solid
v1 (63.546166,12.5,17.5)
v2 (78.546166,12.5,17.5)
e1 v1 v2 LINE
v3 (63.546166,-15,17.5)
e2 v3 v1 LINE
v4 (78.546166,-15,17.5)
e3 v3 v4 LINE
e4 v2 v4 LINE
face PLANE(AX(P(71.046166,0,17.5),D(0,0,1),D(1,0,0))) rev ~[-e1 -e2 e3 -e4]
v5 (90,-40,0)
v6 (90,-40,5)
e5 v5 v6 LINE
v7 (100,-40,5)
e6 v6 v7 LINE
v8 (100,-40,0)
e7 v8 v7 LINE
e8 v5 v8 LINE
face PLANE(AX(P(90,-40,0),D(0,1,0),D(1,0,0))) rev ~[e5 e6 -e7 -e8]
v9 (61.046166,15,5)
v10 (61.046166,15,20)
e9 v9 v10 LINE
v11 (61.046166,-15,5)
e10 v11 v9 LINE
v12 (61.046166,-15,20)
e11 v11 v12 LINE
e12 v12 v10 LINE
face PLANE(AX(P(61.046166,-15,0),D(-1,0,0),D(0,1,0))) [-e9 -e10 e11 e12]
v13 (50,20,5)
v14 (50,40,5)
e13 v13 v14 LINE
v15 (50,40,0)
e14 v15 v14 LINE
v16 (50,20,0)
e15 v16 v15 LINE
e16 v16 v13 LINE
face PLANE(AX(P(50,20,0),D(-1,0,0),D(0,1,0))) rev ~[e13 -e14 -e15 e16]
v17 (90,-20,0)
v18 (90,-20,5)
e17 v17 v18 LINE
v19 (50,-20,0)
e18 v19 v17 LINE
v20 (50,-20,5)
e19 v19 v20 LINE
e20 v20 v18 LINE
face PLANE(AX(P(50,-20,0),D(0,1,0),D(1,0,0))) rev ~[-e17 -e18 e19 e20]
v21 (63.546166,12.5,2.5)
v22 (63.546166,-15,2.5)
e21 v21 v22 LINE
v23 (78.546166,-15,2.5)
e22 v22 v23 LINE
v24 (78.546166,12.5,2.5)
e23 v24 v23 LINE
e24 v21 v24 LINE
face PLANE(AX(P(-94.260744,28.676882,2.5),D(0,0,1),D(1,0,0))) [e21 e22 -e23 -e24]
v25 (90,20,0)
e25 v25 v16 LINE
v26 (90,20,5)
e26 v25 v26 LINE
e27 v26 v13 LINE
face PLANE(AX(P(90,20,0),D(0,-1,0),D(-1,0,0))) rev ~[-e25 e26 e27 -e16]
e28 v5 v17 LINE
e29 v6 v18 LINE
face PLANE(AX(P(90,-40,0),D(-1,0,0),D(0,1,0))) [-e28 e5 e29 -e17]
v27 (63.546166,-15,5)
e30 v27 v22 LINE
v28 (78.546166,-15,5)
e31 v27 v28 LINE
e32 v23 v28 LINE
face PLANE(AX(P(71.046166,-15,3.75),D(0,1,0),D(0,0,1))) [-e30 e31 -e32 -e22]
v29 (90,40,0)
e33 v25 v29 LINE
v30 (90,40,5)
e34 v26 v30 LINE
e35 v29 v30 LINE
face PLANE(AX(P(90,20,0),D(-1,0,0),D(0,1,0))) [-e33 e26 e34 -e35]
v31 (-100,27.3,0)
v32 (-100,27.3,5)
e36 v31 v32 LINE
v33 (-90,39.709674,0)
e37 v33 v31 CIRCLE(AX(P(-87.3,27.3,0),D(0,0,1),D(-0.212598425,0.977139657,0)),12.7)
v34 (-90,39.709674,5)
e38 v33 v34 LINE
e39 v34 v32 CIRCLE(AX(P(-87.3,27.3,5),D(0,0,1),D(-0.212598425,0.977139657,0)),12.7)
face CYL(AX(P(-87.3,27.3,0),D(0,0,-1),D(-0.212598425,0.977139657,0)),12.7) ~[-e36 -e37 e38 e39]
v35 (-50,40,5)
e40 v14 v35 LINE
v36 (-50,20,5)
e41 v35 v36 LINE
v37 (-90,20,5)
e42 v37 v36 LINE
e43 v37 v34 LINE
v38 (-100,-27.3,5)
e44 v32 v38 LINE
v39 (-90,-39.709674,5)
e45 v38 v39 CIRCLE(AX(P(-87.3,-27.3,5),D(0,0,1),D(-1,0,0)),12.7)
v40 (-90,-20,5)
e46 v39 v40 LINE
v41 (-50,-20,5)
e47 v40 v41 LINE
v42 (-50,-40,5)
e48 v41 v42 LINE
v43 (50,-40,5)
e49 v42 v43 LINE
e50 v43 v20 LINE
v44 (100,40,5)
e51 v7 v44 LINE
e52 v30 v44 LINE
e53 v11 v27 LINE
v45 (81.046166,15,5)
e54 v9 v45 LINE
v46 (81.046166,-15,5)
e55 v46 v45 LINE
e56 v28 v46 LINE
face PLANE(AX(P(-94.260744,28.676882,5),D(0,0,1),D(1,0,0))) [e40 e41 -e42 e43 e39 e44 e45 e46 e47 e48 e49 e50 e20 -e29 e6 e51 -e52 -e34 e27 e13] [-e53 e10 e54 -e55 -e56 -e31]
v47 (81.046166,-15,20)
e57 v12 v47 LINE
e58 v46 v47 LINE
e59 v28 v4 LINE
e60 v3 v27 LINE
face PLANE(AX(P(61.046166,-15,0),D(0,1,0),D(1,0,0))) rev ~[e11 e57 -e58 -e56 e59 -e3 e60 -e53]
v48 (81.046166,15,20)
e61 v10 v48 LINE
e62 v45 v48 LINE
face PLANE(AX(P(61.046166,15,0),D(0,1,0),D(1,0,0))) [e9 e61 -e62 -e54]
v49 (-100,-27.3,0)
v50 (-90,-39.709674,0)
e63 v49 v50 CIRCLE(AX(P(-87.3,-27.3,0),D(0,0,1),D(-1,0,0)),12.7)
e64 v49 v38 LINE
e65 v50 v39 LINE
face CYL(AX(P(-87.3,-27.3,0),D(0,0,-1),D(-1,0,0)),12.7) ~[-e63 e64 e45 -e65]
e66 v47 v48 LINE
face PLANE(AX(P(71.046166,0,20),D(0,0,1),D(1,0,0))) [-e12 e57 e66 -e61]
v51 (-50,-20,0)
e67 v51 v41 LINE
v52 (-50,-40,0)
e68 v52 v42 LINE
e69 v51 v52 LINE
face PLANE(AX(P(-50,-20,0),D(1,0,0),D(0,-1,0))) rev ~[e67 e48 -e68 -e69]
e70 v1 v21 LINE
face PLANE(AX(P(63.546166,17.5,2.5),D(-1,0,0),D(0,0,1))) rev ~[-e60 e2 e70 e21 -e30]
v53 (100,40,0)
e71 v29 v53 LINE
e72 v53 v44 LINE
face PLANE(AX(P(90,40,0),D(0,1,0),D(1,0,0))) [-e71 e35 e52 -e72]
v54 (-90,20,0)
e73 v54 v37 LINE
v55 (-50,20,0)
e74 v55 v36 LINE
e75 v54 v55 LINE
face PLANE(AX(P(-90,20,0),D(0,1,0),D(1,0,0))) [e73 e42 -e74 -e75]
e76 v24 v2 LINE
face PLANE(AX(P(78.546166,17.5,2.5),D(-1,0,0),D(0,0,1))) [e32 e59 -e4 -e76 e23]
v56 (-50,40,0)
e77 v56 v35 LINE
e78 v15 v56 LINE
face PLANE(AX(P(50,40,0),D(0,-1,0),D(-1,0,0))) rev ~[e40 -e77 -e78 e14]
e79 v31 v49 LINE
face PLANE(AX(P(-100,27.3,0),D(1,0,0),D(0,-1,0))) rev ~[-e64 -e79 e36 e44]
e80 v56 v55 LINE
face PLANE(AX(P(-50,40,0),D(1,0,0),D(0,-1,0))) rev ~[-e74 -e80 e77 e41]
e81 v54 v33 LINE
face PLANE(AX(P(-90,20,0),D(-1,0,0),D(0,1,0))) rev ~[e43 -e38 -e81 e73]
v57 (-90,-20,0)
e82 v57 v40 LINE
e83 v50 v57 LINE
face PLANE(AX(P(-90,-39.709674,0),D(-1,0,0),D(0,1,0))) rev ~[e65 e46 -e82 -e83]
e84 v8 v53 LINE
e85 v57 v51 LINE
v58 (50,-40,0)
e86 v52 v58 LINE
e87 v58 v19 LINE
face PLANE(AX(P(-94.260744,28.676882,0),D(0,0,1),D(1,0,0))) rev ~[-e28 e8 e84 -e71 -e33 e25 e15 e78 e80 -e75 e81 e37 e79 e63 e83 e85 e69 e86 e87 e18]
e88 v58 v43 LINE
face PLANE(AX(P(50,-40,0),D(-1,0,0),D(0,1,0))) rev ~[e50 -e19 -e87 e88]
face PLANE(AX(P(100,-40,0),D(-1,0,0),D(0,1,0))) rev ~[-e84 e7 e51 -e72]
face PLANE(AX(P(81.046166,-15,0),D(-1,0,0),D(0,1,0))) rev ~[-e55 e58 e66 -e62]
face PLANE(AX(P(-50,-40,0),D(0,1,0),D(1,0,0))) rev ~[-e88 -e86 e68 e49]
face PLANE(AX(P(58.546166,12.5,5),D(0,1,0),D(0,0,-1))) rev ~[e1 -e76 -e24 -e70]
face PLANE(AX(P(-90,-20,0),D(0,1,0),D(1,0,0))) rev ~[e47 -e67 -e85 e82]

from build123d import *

# Parameters (mm, degrees)
F0_W        = 20
F0_H        = 30
F1_DEPTH    = 20
F0_W_2      = 10
F0_H_2      = 40
F0_W_3      = 40
F0_H_3      = 20
F2_DEPTH    = 5
F3_T        = 2.5
F3_T3_DEPTH = 25
F3_T5_DEPTH = 35
F3_T7_DEPTH = 10


# Not quite as in the source:
# - a shell that OpenCascade refuses in one call is made with other operations: the cavity is built on its own and cut out


with BuildPart() as f1:
    # F0 (on Top) → F1 (new body)
    with BuildSketch(Plane.XY):
        with Locations((71.046166122, 0)):
            Rectangle(F0_W, F0_H)
    extrude(amount=F1_DEPTH)

    # F0 (on Top) → F2 (join)
    with BuildSketch(Plane.XY):
        with BuildLine():
            ThreePointArc((-90, 39.709673646), (-97.1888826467, 35.2686887253), (-100, 27.3))
            Line((-100, 27.3), (-100, 20))
            Line((-100, 20), (-90, 20))
            Line((-90, 20), (-90, 39.709673646))
        make_face()
        with Locations((-95, 0)):
            Rectangle(F0_W_2, F0_H_2)
        with BuildLine():
            Line((-90, -20), (-100, -20))
            Line((-100, -20), (-100, -27.3))
            ThreePointArc((-100, -27.3), (-97.1888826467, -35.2686887253), (-90, -39.709673646))
            Line((-90, -39.709673646), (-90, -20))
        make_face()
        with Locations((-70, 0)):
            Rectangle(F0_W_3, F0_H_2)
        Polygon((-50, 40), (-50, 20), (-50, -20), (-50, -40), (50, -40), (50, -20), (50, 20), (50, 40), align=None)
        with Locations((70, 0)):
            Rectangle(F0_W_3, F0_H_2)
        with Locations((71.046166122, 0)):
            Rectangle(F0_W, F0_H, mode=Mode.SUBTRACT)
        with Locations((95, 0)):
            Rectangle(F0_W_2, F0_H_2)
        with Locations((95, -30)):
            Rectangle(F0_W_2, F0_H_3)
        with Locations((95, 30)):
            Rectangle(F0_W_2, F0_H_3)
    extrude(amount=F2_DEPTH)

    # F3: shell of thickness 2.5, made by hand


with BuildPart() as f3_core1:
    # F3_t2: copy of F1
    add(f1.part)

    # the walls: a layer under each face that stays
    f3_faces = [f3_core1.faces().sort_by_distance(p)[0] for p in [
        (71.046166122, 15, 12.5),
        (0, 0, 5),
        (61.046166122, 0, 12.5),
        (71.046166122, 0, 20),
        (81.046166122, 0, 12.5),
        (-97.1888826467, 35.2686887253, 2.5),
        (-100, 0, 2.5),
        (-97.1888826467, -35.2686887253, 2.5),
        (-90, -29.854836823, 2.5),
        (-70, -20, 2.5),
        (-50, -30, 2.5),
        (0, -40, 2.5),
        (50, -30, 2.5),
        (70, -20, 2.5),
        (90, -30, 2.5),
        (95, -40, 2.5),
        (100, 0, 2.5),
        (95, 40, 2.5),
        (90, 30, 2.5),
        (70, 20, 2.5),
        (50, 30, 2.5),
        (0, 40, 2.5),
        (-50, 30, 2.5),
        (-70, 20, 2.5),
        (-90, 29.854836823, 2.5),
        (0, 0, 0),
    ]]
    thicken(f3_faces, amount=-F3_T, mode=Mode.SUBTRACT)

    # F3_s4 → F3_t3 (cut)
    with BuildSketch(Plane.YZ.offset(58.546166122)):
        Polygon((15.025, 5.025), (12.5, 5), (12.5, 2.5), (15, 2.5), align=None)
    extrude(amount=F3_T3_DEPTH, mode=Mode.SUBTRACT)

    # F3_s6 → F3_t5 (cut)
    with BuildSketch(Plane.XZ.offset(-17.5)):
        Polygon((61.021166122, 5.025), (61.046166122, 2.5), (63.546166122, 2.5), (63.546166122, 5), align=None)
        Polygon((81.071166122, 5.025), (81.046166122, 2.5), (78.546166122, 2.5), (78.546166122, 5), align=None)
    extrude(amount=F3_T5_DEPTH, mode=Mode.SUBTRACT)

    # F3_s8 → F3_t7 (cut)
    with BuildSketch(Plane.XY.offset(-2.5)):
        Polygon((-89.975, -20.025), (-92.5, -20), (-92.5, -17.5), (-90, -17.5), align=None)
        Polygon((-50.025, -20.025), (-50, -17.5), (-47.5, -17.5), (-47.5, -20), align=None)
        Polygon((50.025, -20.025), (47.5, -20), (47.5, -17.5), (50, -17.5), align=None)
        Polygon((89.975, -20.025), (90, -17.5), (92.5, -17.5), (92.5, -20), align=None)
        Polygon((89.975, 20.025), (92.5, 20), (92.5, 17.5), (90, 17.5), align=None)
        Polygon((50.025, 20.025), (50, 17.5), (47.5, 17.5), (47.5, 20), align=None)
        Polygon((-50.025, 20.025), (-47.5, 20), (-47.5, 17.5), (-50, 17.5), align=None)
        Polygon((-89.975, 20.025), (-90, 17.5), (-92.5, 17.5), (-92.5, 20), align=None)
    extrude(amount=F3_T7_DEPTH, mode=Mode.SUBTRACT)


with BuildPart() as f1_1:
    add(f1.part)

    # what is left inside the walls is the cavity
    f3_cavity = [f3_core1.part.solids().sort_by_distance(p)[0] for p in [
        (71.046166, -5.833333, 17.475),
    ]]
    add(f3_cavity, mode=Mode.SUBTRACT)


solid = f1_1.part
